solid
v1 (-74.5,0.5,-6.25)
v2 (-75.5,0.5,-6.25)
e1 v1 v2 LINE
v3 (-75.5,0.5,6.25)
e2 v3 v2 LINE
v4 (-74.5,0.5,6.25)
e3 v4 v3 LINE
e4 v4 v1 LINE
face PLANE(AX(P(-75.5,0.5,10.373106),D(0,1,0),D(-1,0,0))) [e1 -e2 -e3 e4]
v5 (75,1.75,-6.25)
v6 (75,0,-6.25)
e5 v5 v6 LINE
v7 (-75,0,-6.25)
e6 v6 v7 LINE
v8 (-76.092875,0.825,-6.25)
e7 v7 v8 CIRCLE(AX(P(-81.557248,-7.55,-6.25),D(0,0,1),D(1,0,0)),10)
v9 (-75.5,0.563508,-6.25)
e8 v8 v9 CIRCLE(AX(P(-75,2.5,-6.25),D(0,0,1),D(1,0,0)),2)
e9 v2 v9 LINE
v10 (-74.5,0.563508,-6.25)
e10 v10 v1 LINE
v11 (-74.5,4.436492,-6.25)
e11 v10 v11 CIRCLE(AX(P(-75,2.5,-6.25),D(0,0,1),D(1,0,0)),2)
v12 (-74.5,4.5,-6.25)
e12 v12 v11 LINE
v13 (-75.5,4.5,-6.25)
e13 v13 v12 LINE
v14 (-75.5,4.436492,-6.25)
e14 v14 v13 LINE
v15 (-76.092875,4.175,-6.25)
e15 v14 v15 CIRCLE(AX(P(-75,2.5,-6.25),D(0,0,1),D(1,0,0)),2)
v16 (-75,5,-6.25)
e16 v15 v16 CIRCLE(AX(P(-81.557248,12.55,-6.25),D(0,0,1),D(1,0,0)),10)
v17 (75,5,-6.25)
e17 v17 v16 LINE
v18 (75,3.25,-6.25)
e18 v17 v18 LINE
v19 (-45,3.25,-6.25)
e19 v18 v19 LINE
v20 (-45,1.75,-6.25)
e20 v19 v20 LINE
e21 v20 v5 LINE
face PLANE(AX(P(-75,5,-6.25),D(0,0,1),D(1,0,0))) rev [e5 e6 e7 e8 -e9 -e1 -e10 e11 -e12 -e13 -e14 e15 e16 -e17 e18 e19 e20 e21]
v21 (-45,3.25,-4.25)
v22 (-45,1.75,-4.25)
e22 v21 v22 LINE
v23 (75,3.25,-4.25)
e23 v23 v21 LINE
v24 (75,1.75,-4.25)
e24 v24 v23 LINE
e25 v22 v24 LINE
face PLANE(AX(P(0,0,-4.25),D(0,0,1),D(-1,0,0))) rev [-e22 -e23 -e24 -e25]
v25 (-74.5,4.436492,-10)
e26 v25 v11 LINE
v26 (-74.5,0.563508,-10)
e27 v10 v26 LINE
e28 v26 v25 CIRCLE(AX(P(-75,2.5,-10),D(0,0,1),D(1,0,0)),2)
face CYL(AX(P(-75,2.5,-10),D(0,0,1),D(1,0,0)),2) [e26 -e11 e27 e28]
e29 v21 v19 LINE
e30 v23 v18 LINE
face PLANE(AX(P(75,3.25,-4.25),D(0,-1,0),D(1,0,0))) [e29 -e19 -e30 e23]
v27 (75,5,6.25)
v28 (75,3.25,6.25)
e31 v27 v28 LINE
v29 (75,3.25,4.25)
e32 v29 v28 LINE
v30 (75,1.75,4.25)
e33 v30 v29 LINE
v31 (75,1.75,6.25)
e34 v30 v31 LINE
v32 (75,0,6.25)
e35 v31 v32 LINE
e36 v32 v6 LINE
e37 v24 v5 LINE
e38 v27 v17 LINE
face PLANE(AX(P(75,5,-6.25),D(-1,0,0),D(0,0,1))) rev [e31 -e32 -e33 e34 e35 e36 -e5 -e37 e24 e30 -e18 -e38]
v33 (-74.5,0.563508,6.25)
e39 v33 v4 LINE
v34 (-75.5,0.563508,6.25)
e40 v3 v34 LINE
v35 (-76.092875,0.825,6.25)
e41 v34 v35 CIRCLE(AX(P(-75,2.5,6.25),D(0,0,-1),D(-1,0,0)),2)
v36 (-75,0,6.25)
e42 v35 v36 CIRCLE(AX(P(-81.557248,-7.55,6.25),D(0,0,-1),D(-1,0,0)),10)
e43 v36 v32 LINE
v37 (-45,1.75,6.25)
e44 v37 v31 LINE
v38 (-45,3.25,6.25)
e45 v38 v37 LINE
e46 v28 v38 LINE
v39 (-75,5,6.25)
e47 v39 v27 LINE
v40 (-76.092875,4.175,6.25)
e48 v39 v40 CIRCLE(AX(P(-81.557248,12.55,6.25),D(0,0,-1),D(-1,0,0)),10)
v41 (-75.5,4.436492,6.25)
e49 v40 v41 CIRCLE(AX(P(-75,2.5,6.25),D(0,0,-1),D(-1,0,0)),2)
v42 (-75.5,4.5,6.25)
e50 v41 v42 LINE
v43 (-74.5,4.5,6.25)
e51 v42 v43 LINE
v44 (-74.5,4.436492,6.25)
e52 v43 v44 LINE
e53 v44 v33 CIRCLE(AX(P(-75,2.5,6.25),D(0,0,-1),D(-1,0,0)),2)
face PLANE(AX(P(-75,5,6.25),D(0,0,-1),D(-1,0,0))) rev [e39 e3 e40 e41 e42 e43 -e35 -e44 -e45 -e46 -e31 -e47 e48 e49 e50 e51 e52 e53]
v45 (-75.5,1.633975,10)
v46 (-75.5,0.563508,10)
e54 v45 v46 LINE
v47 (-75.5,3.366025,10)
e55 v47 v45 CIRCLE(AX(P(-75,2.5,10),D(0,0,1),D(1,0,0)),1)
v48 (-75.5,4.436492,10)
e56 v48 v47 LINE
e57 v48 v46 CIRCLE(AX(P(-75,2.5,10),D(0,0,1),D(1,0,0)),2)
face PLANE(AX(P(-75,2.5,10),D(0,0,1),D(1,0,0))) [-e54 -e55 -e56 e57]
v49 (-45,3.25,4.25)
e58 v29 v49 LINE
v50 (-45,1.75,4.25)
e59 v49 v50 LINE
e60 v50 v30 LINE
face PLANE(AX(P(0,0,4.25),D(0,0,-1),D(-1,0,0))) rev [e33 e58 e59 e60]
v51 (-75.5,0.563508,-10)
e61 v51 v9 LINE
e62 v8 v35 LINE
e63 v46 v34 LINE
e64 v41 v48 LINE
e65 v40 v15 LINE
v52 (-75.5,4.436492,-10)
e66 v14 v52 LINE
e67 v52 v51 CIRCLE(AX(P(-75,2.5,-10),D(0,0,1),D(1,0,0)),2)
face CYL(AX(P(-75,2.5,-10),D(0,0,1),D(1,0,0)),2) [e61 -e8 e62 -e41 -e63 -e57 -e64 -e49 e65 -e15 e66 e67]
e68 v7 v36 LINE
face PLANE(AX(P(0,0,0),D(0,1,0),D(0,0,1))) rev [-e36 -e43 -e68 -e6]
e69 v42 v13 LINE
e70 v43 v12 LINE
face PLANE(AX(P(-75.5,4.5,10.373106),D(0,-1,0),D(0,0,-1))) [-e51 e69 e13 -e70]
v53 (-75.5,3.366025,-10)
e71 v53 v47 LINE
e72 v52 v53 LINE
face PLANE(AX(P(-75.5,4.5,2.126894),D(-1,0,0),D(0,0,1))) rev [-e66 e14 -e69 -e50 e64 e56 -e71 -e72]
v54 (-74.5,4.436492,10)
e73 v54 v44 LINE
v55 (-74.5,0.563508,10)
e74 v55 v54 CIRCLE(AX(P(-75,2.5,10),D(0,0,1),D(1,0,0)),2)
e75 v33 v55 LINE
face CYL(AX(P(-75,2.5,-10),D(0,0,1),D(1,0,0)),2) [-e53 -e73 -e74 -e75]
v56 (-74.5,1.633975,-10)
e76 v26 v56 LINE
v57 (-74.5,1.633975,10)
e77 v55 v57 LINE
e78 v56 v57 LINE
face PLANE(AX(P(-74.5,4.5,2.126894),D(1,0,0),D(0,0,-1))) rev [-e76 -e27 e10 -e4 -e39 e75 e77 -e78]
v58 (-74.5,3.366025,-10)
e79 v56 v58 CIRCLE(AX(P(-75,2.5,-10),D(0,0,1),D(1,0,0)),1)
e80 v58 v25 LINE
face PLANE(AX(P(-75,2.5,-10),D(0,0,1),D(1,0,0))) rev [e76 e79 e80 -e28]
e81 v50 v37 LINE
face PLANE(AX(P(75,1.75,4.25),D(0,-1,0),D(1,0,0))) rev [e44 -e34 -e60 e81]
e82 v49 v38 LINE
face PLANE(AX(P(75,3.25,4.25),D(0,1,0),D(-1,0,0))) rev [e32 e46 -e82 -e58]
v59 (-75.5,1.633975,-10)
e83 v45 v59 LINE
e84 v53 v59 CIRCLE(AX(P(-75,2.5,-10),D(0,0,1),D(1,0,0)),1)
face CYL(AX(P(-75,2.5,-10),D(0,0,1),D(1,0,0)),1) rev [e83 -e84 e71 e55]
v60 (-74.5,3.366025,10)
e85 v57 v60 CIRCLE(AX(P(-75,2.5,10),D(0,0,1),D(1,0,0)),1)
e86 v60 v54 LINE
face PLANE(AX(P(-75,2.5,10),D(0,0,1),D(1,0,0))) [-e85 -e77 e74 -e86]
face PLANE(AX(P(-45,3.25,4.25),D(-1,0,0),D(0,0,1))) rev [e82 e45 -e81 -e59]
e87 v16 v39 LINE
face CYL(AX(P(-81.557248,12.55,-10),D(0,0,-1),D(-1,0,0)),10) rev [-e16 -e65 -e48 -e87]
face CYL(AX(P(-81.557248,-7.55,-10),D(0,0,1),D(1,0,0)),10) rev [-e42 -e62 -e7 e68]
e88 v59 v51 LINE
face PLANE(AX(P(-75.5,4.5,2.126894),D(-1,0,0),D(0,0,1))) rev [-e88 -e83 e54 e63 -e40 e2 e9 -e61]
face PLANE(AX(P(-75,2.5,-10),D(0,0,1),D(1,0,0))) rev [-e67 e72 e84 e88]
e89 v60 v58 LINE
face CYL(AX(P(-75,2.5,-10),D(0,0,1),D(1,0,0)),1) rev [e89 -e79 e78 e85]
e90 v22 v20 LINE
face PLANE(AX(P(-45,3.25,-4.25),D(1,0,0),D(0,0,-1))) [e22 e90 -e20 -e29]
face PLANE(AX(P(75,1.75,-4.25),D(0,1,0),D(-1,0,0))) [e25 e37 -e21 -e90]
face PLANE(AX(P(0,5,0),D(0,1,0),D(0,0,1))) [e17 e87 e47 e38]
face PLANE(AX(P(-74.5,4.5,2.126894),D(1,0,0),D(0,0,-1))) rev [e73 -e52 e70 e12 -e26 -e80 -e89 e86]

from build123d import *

# Parameters (mm, degrees)
SKETCH2_W                = 150
SKETCH2_H                = 12.5
BOSS_EXTRUDE1_DEPTH      = 5
BOSS_EXTRUDE2_DEPTH      = 10
BOSS_EXTRUDE2_DEPTH_BACK = 10
SKETCH3_R                = 2
FILLET1_R                = 10
SKETCH4_R                = 1
CUT_EXTRUDE1_DEPTH       = 80.711981534
CUT_EXTRUDE2_START       = -20
SKETCH5_W                = 1
SKETCH5_H                = 4
CUT_EXTRUDE2_DEPTH       = 20
SKETCH6_W                = 120
SKETCH6_H                = 1.5
CUT_EXTRUDE3_DEPTH       = 2


with BuildPart() as part:
    # Sketch2 → Boss-Extrude1 (new body)
    with BuildSketch(Plane(origin=(0, 0, 0), x_dir=(1, 0, 0), z_dir=(0, 1, 0))):
        Rectangle(SKETCH2_W, SKETCH2_H)
    extrude(amount=BOSS_EXTRUDE1_DEPTH)

    # Sketch3 → Boss-Extrude2 (add, two sides: drawn at the far end of the back side and taken through both)
    with BuildSketch(Plane.XY.offset(-BOSS_EXTRUDE2_DEPTH_BACK)):
        with Locations((-75, 2.5)):
            Circle(SKETCH3_R)
    extrude(amount=BOSS_EXTRUDE2_DEPTH + BOSS_EXTRUDE2_DEPTH_BACK)

    # Fillet1
    # the kernel refuses this fillet: 10 mm, written as the material it adds along each edge
    with BuildSketch(Plane(origin=(-75, 4.5, 6.25), x_dir=(-5.0590642785823295e-12, 1.0, 0), z_dir=(0, 0, -1))) as fillet1_piece_1:
        with BuildLine():
            CenterArc((8.05, -6.557247898), FILLET1_R, 139.025369771, 7.851690022)
            Line((-0.325, -1.09287465), (-0.4925, -0.983587185))
            ThreePointArc((-0.4925, -0.983587185), (-0.274673944, -0.513078941), (-0.2, 0))
            Line((-0.2, 0), (0, 0.2))
            ThreePointArc((0, 0.2), (0.25, 0.2), (0.349, 0.131144958))
            Line((0.349, 0.131144958), (0.5, 0))
        make_face()
    extrude(amount=6.25)
    with BuildSketch(Plane(origin=(-75, 0.5, 6.25), x_dir=(-5.059064278582354e-12, -1.0, 0), z_dir=(0, 0, -1)), Plane(origin=(-75, 4.5, -6.25), x_dir=(-5.0590642785823295e-12, 1.0, 0), z_dir=(0, 0, 1))) as fillet1_piece_2:
        with BuildLine():
            CenterArc((8.05, 6.557247898), FILLET1_R, 213.122940208, 7.851690022)
            Line((-0.325, 1.09287465), (-0.4925, 0.983587185))
            ThreePointArc((-0.4925, 0.983587185), (-0.274673944, 0.513078941), (-0.2, 0))
            Line((-0.2, 0), (0, -0.2))
            ThreePointArc((0, -0.2), (0.25, -0.2), (0.349, -0.131144958))
            Line((0.349, -0.131144958), (0.5, 0))
        make_face()
    extrude(amount=6.25)
    with BuildSketch(Plane(origin=(-75, 0.5, -6.25), x_dir=(-0.9585144756337048, 0.2850438562759136, 0), z_dir=(0, 0, 1))) as fillet1_piece_3:
        with BuildLine():
            CenterArc((3.990613988, 9.585144756), FILLET1_R, 245.586839874, 7.851690022)
            Line((-0.142521928, 0.479257238), (-0.225184646, 0.297139487))
            ThreePointArc((-0.225184646, 0.297139487), (-0.262963859, 0.182619848), (-0.191702895, -0.057008771))
            Line((-0.191702895, -0.057008771), (0.057008771, -0.191702895))
            ThreePointArc((0.057008771, -0.191702895), (0.570087713, -0.117028951), (1.083166654, -0.191702895))
            Line((1.083166654, -0.191702895), (1.140175425, 0))
        make_face()
    extrude(amount=6.25)

    # Sketch4 → Cut-Extrude1 (cut, through all)
    with BuildSketch(Plane.XY.offset(10)):
        with Locations((-75, 2.5)):
            Circle(SKETCH4_R)
    extrude(amount=-CUT_EXTRUDE1_DEPTH, mode=Mode.SUBTRACT)

    # Sketch5 → Cut-Extrude2 (cut)
    with BuildSketch(Plane.XY.offset(10).offset(CUT_EXTRUDE2_START)):
        with Locations((-75, 2.5)):
            Rectangle(SKETCH5_W, SKETCH5_H)
    cut_extrude2 = extrude(amount=CUT_EXTRUDE2_DEPTH, mode=Mode.SUBTRACT)

    # Mirror3: Cut-Extrude2 across plane
    add(cut_extrude2.mirror(Plane.XY), mode=Mode.SUBTRACT)

    # Sketch6 → Cut-Extrude3 (cut)
    with BuildSketch(Plane.XY.offset(6.25)):
        with Locations((15, 2.5)):
            Rectangle(SKETCH6_W, SKETCH6_H)
    cut_extrude3 = extrude(amount=-CUT_EXTRUDE3_DEPTH, mode=Mode.SUBTRACT)

    # Mirror4: Cut-Extrude3 across plane
    add(cut_extrude3.mirror(Plane.XY), mode=Mode.SUBTRACT)


solid = part.part
